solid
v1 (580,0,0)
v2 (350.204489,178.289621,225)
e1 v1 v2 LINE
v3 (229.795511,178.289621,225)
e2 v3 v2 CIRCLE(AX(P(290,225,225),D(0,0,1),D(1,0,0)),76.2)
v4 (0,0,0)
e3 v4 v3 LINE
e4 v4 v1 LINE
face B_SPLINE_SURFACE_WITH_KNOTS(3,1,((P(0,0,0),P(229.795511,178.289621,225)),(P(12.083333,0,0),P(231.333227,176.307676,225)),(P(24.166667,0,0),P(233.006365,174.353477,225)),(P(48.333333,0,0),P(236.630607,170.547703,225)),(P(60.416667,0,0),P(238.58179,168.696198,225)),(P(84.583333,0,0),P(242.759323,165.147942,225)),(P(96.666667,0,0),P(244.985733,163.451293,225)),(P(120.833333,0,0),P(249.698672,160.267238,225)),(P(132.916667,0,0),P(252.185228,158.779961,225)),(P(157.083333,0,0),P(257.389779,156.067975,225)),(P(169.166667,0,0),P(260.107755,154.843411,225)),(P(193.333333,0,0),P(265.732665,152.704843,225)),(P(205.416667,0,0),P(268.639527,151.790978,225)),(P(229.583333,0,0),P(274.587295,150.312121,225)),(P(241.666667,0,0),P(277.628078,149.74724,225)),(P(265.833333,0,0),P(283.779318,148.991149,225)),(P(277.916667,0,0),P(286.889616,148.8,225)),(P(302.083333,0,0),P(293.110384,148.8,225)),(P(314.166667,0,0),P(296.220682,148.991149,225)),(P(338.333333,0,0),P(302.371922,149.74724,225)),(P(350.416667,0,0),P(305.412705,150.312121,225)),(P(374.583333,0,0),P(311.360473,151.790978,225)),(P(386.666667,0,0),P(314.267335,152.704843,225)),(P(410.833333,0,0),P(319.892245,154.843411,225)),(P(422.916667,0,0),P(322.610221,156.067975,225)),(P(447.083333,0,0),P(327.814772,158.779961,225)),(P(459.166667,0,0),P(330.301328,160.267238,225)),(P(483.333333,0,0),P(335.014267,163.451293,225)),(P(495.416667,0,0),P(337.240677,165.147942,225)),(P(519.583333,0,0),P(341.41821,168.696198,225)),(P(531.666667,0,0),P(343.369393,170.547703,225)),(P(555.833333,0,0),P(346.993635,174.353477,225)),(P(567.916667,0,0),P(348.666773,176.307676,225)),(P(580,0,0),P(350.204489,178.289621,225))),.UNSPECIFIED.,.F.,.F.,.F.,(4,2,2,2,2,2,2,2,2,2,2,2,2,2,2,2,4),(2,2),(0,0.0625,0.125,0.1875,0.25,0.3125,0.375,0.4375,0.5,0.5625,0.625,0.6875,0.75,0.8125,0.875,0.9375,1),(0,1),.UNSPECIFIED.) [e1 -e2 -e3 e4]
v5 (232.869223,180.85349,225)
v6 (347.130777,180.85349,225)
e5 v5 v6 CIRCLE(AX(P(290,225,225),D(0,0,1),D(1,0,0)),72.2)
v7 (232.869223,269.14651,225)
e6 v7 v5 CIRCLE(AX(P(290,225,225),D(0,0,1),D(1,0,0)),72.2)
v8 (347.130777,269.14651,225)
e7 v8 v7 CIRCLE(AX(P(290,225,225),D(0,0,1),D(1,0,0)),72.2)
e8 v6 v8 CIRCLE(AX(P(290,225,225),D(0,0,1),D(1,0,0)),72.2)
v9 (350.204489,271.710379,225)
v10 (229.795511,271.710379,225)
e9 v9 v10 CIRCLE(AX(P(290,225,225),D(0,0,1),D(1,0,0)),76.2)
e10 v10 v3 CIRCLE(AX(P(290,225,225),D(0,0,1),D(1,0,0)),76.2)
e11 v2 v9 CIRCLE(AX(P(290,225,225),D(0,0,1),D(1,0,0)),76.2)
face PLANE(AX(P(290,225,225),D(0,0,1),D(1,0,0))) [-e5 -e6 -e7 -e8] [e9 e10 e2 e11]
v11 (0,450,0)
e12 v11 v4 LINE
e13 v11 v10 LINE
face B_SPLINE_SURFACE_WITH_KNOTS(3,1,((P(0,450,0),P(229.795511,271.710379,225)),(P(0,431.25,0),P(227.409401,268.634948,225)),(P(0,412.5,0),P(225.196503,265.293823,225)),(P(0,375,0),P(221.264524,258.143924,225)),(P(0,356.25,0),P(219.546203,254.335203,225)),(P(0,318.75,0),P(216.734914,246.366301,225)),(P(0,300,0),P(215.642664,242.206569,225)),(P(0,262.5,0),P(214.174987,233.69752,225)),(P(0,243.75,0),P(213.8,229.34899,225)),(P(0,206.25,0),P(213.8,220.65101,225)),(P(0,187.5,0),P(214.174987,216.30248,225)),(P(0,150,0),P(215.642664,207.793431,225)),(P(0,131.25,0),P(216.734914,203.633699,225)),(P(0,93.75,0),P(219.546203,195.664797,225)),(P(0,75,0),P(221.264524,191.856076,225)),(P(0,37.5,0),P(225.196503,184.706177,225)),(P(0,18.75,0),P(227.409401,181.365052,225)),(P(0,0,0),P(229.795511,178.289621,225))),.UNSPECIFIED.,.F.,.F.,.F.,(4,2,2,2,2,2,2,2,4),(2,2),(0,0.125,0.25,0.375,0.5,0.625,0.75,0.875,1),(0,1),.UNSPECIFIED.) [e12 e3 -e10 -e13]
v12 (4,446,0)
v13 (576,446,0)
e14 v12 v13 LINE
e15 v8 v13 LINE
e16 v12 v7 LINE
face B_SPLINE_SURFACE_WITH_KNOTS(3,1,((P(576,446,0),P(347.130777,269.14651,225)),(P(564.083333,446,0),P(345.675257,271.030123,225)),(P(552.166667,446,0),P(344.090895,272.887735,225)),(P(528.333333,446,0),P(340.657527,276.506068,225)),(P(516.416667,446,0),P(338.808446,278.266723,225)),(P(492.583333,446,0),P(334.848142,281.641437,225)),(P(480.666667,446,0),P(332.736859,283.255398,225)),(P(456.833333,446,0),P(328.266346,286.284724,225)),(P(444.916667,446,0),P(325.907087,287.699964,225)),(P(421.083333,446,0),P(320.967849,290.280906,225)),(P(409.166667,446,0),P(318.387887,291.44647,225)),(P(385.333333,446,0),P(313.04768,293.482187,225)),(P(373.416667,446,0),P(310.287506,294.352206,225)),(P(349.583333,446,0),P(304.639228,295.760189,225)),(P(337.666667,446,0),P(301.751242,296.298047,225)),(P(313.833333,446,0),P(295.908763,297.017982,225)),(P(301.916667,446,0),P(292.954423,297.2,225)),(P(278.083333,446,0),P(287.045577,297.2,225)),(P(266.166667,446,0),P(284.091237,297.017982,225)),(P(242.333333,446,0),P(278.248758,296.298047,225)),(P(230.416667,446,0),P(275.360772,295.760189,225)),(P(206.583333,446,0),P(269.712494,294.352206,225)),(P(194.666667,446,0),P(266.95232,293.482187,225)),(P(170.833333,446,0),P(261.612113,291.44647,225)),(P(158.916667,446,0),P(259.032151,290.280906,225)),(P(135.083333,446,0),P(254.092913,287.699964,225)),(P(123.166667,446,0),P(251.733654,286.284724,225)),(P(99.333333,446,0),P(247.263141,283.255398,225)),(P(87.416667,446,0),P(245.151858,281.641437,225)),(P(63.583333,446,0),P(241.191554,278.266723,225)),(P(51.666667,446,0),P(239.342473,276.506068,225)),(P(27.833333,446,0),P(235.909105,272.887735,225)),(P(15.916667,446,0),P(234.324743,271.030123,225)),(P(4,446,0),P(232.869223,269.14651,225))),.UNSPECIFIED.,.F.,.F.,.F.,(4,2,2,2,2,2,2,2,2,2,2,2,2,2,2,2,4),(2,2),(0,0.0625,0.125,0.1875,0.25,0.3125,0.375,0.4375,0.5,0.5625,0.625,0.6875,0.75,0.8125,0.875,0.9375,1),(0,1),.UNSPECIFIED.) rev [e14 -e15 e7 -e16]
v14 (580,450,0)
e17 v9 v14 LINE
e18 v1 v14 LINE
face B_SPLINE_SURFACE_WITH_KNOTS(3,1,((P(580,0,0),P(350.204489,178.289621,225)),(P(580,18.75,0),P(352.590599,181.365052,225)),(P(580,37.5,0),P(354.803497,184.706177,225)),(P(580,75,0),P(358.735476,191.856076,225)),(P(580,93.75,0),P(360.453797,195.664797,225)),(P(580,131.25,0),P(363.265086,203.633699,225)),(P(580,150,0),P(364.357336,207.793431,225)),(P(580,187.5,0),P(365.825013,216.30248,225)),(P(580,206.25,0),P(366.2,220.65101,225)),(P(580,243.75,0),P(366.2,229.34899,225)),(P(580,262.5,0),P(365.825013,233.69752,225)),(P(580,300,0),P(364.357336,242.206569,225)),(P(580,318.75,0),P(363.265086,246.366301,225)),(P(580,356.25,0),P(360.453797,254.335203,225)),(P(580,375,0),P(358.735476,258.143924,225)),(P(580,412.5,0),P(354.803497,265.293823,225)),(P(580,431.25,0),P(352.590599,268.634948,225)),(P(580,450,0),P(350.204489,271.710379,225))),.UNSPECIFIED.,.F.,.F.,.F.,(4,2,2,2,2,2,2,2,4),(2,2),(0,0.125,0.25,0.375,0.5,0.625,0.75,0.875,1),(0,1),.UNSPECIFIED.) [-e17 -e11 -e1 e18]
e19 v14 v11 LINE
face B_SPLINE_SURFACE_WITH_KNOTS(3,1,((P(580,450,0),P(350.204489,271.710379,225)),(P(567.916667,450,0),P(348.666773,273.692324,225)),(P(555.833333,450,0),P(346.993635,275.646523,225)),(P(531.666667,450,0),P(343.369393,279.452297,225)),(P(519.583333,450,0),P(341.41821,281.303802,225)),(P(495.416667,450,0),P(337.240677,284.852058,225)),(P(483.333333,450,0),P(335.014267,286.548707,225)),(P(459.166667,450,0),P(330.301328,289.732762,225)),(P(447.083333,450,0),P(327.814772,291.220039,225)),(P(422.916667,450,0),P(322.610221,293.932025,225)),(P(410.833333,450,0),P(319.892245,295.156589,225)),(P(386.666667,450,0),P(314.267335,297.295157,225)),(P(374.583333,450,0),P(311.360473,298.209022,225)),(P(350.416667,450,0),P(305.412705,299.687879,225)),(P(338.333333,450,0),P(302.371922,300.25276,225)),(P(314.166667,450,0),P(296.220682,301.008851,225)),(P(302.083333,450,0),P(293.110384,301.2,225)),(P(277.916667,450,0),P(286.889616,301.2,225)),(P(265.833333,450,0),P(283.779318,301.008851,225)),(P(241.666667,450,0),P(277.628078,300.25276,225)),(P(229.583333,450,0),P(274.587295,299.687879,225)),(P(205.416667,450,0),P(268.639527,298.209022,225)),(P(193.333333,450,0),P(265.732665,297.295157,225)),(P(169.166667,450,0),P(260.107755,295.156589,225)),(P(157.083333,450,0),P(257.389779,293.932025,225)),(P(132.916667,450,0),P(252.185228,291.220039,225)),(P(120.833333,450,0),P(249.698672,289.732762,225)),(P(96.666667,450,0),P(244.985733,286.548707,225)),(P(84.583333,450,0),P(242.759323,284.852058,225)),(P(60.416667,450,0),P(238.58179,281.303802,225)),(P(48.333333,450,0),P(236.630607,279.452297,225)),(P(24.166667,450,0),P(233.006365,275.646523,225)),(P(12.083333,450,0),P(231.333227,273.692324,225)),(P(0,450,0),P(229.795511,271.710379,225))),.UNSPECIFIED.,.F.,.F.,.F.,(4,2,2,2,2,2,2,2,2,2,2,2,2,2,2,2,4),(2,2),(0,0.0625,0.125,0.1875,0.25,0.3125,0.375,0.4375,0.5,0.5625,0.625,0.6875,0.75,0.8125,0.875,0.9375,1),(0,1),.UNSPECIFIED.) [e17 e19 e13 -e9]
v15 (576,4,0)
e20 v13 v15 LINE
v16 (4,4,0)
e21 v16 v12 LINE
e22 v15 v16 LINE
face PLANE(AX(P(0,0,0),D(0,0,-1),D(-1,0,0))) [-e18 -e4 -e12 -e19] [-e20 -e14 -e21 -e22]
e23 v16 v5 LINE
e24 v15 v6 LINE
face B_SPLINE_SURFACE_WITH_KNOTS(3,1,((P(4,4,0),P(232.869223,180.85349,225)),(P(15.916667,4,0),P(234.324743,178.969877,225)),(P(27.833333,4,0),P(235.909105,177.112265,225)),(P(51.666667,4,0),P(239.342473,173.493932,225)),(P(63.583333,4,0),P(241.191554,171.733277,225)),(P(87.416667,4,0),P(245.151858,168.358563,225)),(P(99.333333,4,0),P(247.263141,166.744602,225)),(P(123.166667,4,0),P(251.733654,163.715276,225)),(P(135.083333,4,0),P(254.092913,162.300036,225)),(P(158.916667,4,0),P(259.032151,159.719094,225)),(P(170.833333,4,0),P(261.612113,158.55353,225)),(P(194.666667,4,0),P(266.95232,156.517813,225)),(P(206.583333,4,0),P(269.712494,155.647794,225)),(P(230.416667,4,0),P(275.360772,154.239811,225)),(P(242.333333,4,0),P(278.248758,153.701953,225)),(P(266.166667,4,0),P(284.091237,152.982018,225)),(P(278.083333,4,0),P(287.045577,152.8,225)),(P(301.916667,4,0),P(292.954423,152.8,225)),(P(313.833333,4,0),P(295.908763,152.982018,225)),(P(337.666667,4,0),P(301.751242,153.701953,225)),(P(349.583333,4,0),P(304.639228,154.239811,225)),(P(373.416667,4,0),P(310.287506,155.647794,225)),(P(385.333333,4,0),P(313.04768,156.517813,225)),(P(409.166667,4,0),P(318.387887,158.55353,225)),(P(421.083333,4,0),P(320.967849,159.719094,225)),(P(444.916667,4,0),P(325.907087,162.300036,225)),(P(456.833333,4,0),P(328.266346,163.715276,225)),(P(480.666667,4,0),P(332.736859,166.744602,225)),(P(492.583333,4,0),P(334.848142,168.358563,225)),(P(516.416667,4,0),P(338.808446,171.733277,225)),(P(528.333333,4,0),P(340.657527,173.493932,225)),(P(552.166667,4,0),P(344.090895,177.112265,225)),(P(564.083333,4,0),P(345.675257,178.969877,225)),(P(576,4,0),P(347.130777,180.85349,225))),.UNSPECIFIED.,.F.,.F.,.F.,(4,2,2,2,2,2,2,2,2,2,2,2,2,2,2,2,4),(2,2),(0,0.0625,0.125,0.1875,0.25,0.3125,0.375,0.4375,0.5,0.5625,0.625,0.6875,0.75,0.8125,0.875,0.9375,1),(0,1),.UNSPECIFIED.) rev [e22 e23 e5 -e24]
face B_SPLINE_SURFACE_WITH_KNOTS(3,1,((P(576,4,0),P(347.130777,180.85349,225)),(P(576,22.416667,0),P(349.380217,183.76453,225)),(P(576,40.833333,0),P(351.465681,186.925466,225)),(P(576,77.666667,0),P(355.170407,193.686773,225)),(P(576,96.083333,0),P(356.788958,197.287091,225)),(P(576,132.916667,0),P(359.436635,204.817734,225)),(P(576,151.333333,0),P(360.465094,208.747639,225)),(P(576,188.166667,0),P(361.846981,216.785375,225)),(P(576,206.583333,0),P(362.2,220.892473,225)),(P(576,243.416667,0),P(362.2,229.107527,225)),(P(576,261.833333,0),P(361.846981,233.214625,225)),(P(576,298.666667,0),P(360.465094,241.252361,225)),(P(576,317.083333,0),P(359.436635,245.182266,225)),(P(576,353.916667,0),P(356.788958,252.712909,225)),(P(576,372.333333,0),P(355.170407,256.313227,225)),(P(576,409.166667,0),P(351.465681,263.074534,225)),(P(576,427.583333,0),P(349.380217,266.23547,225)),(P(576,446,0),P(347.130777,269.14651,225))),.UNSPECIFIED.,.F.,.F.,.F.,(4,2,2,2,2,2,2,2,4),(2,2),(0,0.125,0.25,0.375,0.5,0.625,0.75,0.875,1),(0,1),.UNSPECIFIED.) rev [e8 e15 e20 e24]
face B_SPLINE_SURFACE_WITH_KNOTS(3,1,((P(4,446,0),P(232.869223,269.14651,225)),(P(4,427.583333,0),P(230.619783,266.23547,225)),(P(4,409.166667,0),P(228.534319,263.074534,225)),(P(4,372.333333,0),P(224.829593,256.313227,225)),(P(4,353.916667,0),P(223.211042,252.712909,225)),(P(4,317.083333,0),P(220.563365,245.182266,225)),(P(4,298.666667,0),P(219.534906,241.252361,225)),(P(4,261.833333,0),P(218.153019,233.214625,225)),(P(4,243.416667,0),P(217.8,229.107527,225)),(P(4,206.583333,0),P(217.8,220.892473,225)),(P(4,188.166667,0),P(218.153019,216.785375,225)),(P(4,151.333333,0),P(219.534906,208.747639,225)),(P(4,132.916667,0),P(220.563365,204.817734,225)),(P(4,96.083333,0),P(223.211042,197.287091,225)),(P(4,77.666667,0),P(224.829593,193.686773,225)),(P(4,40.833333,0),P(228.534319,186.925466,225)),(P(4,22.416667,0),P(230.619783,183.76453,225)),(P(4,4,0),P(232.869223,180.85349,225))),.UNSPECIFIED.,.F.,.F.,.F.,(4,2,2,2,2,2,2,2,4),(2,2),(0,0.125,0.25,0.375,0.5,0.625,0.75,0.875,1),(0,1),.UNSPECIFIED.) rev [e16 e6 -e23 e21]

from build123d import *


with BuildPart() as part:
    # Sketch1 → Loft1 section 0
    with BuildSketch(Plane.XY):
        with BuildLine():
            Line((0, 0), (0, 450))
            Line((0, 450), (580, 450))
            Line((580, 450), (580, 0))
            Line((580, 0), (0, 0))
        make_face()
    # Sketch2 for Loft1 → Loft1 section 1
    with BuildSketch(Plane.XY.offset(225)):
        with BuildLine():
            # circular arc as an exact rational Bezier (weights 1, cos(half-angle), 1)
            Bezier((229.795511203, 178.289620761), (193.554699724, 225), (229.795511203, 271.710379239), weights=[1, 0.790085155, 1])
            Bezier((229.795511203, 271.710379239), (290, 349.307275912), (350.204488797, 271.710379239), weights=[1, 0.612997103, 1])
            Bezier((350.204488797, 271.710379239), (386.445300276, 225), (350.204488797, 178.289620761), weights=[1, 0.790085155, 1])
            Bezier((350.204488797, 178.289620761), (290, 100.692724088), (229.795511203, 178.289620761), weights=[1, 0.612997103, 1])
        make_face()
    loft()

    # Cut-Loft2: read off the stored shape, not the designer's step
    # Cut-Loft2: loft between two sections, ruled curve by curve
    cut_loft2_from = [
        Edge.make_bspline([(576, 446, 0), (564.083333333, 446, 0), (552.166666667, 446, 0), (528.333333333, 446, 0), (516.416666667, 446, 0), (492.583333333, 446, 0), (480.666666667, 446, 0), (456.833333333, 446, 0), (444.916666667, 446, 0), (421.083333333, 446, 0), (409.166666667, 446, 0), (385.333333333, 446, 0), (373.416666667, 446, 0), (349.583333333, 446, 0), (337.666666667, 446, 0), (313.833333333, 446, 0), (301.916666667, 446, 0), (278.083333333, 446, 0), (266.166666667, 446, 0), (242.333333333, 446, 0), (230.416666667, 446, 0), (206.583333333, 446, 0), (194.666666667, 446, 0), (170.833333333, 446, 0), (158.916666667, 446, 0), (135.083333333, 446, 0), (123.166666667, 446, 0), (99.333333333, 446, 0), (87.416666667, 446, 0), (63.583333333, 446, 0), (51.666666667, 446, 0), (27.833333333, 446, 0), (15.916666667, 446, 0), (4, 446, 0)], [0, 0, 0, 0, 0.0625, 0.0625, 0.125, 0.125, 0.1875, 0.1875, 0.25, 0.25, 0.3125, 0.3125, 0.375, 0.375, 0.4375, 0.4375, 0.5, 0.5, 0.5625, 0.5625, 0.625, 0.625, 0.6875, 0.6875, 0.75, 0.75, 0.8125, 0.8125, 0.875, 0.875, 0.9375, 0.9375, 1, 1, 1, 1], 3),
        Edge.make_bspline([(4, 446, 0), (4, 427.583333333, 0), (4, 409.166666667, 0), (4, 372.333333333, 0), (4, 353.916666667, 0), (4, 317.083333333, 0), (4, 298.666666667, 0), (4, 261.833333333, 0), (4, 243.416666667, 0), (4, 206.583333333, 0), (4, 188.166666667, 0), (4, 151.333333333, 0), (4, 132.916666667, 0), (4, 96.083333333, 0), (4, 77.666666667, 0), (4, 40.833333333, 0), (4, 22.416666667, 0), (4, 4, 0)], [0, 0, 0, 0, 0.125, 0.125, 0.25, 0.25, 0.375, 0.375, 0.5, 0.5, 0.625, 0.625, 0.75, 0.75, 0.875, 0.875, 1, 1, 1, 1], 3),
        Edge.make_bspline([(576, 4, 0), (576, 22.416666667, 0), (576, 40.833333333, 0), (576, 77.666666667, 0), (576, 96.083333333, 0), (576, 132.916666667, 0), (576, 151.333333333, 0), (576, 188.166666667, 0), (576, 206.583333333, 0), (576, 243.416666667, 0), (576, 261.833333333, 0), (576, 298.666666667, 0), (576, 317.083333333, 0), (576, 353.916666667, 0), (576, 372.333333333, 0), (576, 409.166666667, 0), (576, 427.583333333, 0), (576, 446, 0)], [0, 0, 0, 0, 0.125, 0.125, 0.25, 0.25, 0.375, 0.375, 0.5, 0.5, 0.625, 0.625, 0.75, 0.75, 0.875, 0.875, 1, 1, 1, 1], 3),
        Edge.make_bspline([(4, 4, 0), (15.916666667, 4, 0), (27.833333333, 4, 0), (51.666666667, 4, 0), (63.583333333, 4, 0), (87.416666667, 4, 0), (99.333333333, 4, 0), (123.166666667, 4, 0), (135.083333333, 4, 0), (158.916666667, 4, 0), (170.833333333, 4, 0), (194.666666667, 4, 0), (206.583333333, 4, 0), (230.416666667, 4, 0), (242.333333333, 4, 0), (266.166666667, 4, 0), (278.083333333, 4, 0), (301.916666667, 4, 0), (313.833333333, 4, 0), (337.666666667, 4, 0), (349.583333333, 4, 0), (373.416666667, 4, 0), (385.333333333, 4, 0), (409.166666667, 4, 0), (421.083333333, 4, 0), (444.916666667, 4, 0), (456.833333333, 4, 0), (480.666666667, 4, 0), (492.583333333, 4, 0), (516.416666667, 4, 0), (528.333333333, 4, 0), (552.166666667, 4, 0), (564.083333333, 4, 0), (576, 4, 0)], [0, 0, 0, 0, 0.0625, 0.0625, 0.125, 0.125, 0.1875, 0.1875, 0.25, 0.25, 0.3125, 0.3125, 0.375, 0.375, 0.4375, 0.4375, 0.5, 0.5, 0.5625, 0.5625, 0.625, 0.625, 0.6875, 0.6875, 0.75, 0.75, 0.8125, 0.8125, 0.875, 0.875, 0.9375, 0.9375, 1, 1, 1, 1], 3),
    ]
    cut_loft2_to = [
        Edge.make_bspline([(347.130777101, 269.146509578, 225), (345.67525748, 271.030123204, 225), (344.090894703, 272.887735344, 225), (340.657527063, 276.506067972, 225), (338.808446099, 278.266722873, 225), (334.848141695, 281.6414368, 225), (332.736859461, 283.255398207, 225), (328.266345603, 286.284723799, 225), (325.90708719, 287.699963514, 225), (320.967848708, 290.280905949, 225), (318.387886703, 291.446469996, 225), (313.047680491, 293.48218681, 225), (310.287505998, 294.352205924, 225), (304.639227705, 295.760189219, 225), (301.751242441, 296.298047084, 225), (295.908763417, 297.017982003, 225), (292.95442333, 297.2, 225), (287.04557667, 297.2, 225), (284.091236583, 297.017982003, 225), (278.248757559, 296.298047084, 225), (275.360772295, 295.760189219, 225), (269.712494002, 294.352205924, 225), (266.952319509, 293.48218681, 225), (261.612113297, 291.446469996, 225), (259.032151292, 290.280905949, 225), (254.09291281, 287.699963514, 225), (251.733654397, 286.284723799, 225), (247.263140539, 283.255398207, 225), (245.151858305, 281.6414368, 225), (241.191553901, 278.266722873, 225), (239.342472937, 276.506067972, 225), (235.909105297, 272.887735344, 225), (234.32474252, 271.030123204, 225), (232.869222899, 269.146509578, 225)], [0, 0, 0, 0, 0.0625, 0.0625, 0.125, 0.125, 0.1875, 0.1875, 0.25, 0.25, 0.3125, 0.3125, 0.375, 0.375, 0.4375, 0.4375, 0.5, 0.5, 0.5625, 0.5625, 0.625, 0.625, 0.6875, 0.6875, 0.75, 0.75, 0.8125, 0.8125, 0.875, 0.875, 0.9375, 0.9375, 1, 1, 1, 1], 3),
        Edge.make_bspline([(232.869222899, 269.146509578, 225), (230.619783486, 266.235470337, 225), (228.53431882, 263.074533519, 225), (224.829593326, 256.31322659, 225), (223.211042232, 252.712908785, 225), (220.563364718, 245.182266319, 225), (219.534906142, 241.252361475, 225), (218.153019223, 233.214624715, 225), (217.8, 229.107527049, 225), (217.8, 220.892472951, 225), (218.153019223, 216.785375285, 225), (219.534906142, 208.747638525, 225), (220.563364718, 204.817733681, 225), (223.211042232, 197.287091215, 225), (224.829593326, 193.68677341, 225), (228.53431882, 186.925466481, 225), (230.619783486, 183.764529663, 225), (232.869222899, 180.853490422, 225)], [0, 0, 0, 0, 0.125, 0.125, 0.25, 0.25, 0.375, 0.375, 0.5, 0.5, 0.625, 0.625, 0.75, 0.75, 0.875, 0.875, 1, 1, 1, 1], 3),
        Edge.make_bspline([(347.130777101, 180.853490422, 225), (349.380216514, 183.764529663, 225), (351.46568118, 186.925466481, 225), (355.170406674, 193.68677341, 225), (356.788957768, 197.287091215, 225), (359.436635282, 204.817733681, 225), (360.465093858, 208.747638525, 225), (361.846980777, 216.785375285, 225), (362.2, 220.892472951, 225), (362.2, 229.107527049, 225), (361.846980777, 233.214624715, 225), (360.465093858, 241.252361475, 225), (359.436635282, 245.182266319, 225), (356.788957768, 252.712908785, 225), (355.170406674, 256.31322659, 225), (351.46568118, 263.074533519, 225), (349.380216514, 266.235470337, 225), (347.130777101, 269.146509578, 225)], [0, 0, 0, 0, 0.125, 0.125, 0.25, 0.25, 0.375, 0.375, 0.5, 0.5, 0.625, 0.625, 0.75, 0.75, 0.875, 0.875, 1, 1, 1, 1], 3),
        Edge.make_bspline([(232.869222899, 180.853490422, 225), (234.32474252, 178.969876796, 225), (235.909105297, 177.112264656, 225), (239.342472937, 173.493932028, 225), (241.191553901, 171.733277127, 225), (245.151858305, 168.3585632, 225), (247.263140539, 166.744601793, 225), (251.733654397, 163.715276201, 225), (254.09291281, 162.300036486, 225), (259.032151292, 159.719094051, 225), (261.612113297, 158.553530004, 225), (266.952319509, 156.51781319, 225), (269.712494002, 155.647794076, 225), (275.360772295, 154.239810781, 225), (278.248757559, 153.701952916, 225), (284.091236583, 152.982017997, 225), (287.04557667, 152.8, 225), (292.95442333, 152.8, 225), (295.908763417, 152.982017997, 225), (301.751242441, 153.701952916, 225), (304.639227705, 154.239810781, 225), (310.287505998, 155.647794076, 225), (313.047680491, 156.51781319, 225), (318.387886703, 158.553530004, 225), (320.967848708, 159.719094051, 225), (325.90708719, 162.300036486, 225), (328.266345603, 163.715276201, 225), (332.736859461, 166.744601793, 225), (334.848141695, 168.3585632, 225), (338.808446099, 171.733277127, 225), (340.657527063, 173.493932028, 225), (344.090894703, 177.112264656, 225), (345.67525748, 178.969876796, 225), (347.130777101, 180.853490422, 225)], [0, 0, 0, 0, 0.0625, 0.0625, 0.125, 0.125, 0.1875, 0.1875, 0.25, 0.25, 0.3125, 0.3125, 0.375, 0.375, 0.4375, 0.4375, 0.5, 0.5, 0.5625, 0.5625, 0.625, 0.625, 0.6875, 0.6875, 0.75, 0.75, 0.8125, 0.8125, 0.875, 0.875, 0.9375, 0.9375, 1, 1, 1, 1], 3),
    ]
    cut_loft2 = Solid(Shell([*[Face.make_surface_from_curves(cut_loft2_from[k], cut_loft2_to[k]) for k in range(4)], Face(Wire(cut_loft2_from)), Face(Wire(cut_loft2_to))]))
    add(cut_loft2, mode=Mode.SUBTRACT)


solid = part.part
